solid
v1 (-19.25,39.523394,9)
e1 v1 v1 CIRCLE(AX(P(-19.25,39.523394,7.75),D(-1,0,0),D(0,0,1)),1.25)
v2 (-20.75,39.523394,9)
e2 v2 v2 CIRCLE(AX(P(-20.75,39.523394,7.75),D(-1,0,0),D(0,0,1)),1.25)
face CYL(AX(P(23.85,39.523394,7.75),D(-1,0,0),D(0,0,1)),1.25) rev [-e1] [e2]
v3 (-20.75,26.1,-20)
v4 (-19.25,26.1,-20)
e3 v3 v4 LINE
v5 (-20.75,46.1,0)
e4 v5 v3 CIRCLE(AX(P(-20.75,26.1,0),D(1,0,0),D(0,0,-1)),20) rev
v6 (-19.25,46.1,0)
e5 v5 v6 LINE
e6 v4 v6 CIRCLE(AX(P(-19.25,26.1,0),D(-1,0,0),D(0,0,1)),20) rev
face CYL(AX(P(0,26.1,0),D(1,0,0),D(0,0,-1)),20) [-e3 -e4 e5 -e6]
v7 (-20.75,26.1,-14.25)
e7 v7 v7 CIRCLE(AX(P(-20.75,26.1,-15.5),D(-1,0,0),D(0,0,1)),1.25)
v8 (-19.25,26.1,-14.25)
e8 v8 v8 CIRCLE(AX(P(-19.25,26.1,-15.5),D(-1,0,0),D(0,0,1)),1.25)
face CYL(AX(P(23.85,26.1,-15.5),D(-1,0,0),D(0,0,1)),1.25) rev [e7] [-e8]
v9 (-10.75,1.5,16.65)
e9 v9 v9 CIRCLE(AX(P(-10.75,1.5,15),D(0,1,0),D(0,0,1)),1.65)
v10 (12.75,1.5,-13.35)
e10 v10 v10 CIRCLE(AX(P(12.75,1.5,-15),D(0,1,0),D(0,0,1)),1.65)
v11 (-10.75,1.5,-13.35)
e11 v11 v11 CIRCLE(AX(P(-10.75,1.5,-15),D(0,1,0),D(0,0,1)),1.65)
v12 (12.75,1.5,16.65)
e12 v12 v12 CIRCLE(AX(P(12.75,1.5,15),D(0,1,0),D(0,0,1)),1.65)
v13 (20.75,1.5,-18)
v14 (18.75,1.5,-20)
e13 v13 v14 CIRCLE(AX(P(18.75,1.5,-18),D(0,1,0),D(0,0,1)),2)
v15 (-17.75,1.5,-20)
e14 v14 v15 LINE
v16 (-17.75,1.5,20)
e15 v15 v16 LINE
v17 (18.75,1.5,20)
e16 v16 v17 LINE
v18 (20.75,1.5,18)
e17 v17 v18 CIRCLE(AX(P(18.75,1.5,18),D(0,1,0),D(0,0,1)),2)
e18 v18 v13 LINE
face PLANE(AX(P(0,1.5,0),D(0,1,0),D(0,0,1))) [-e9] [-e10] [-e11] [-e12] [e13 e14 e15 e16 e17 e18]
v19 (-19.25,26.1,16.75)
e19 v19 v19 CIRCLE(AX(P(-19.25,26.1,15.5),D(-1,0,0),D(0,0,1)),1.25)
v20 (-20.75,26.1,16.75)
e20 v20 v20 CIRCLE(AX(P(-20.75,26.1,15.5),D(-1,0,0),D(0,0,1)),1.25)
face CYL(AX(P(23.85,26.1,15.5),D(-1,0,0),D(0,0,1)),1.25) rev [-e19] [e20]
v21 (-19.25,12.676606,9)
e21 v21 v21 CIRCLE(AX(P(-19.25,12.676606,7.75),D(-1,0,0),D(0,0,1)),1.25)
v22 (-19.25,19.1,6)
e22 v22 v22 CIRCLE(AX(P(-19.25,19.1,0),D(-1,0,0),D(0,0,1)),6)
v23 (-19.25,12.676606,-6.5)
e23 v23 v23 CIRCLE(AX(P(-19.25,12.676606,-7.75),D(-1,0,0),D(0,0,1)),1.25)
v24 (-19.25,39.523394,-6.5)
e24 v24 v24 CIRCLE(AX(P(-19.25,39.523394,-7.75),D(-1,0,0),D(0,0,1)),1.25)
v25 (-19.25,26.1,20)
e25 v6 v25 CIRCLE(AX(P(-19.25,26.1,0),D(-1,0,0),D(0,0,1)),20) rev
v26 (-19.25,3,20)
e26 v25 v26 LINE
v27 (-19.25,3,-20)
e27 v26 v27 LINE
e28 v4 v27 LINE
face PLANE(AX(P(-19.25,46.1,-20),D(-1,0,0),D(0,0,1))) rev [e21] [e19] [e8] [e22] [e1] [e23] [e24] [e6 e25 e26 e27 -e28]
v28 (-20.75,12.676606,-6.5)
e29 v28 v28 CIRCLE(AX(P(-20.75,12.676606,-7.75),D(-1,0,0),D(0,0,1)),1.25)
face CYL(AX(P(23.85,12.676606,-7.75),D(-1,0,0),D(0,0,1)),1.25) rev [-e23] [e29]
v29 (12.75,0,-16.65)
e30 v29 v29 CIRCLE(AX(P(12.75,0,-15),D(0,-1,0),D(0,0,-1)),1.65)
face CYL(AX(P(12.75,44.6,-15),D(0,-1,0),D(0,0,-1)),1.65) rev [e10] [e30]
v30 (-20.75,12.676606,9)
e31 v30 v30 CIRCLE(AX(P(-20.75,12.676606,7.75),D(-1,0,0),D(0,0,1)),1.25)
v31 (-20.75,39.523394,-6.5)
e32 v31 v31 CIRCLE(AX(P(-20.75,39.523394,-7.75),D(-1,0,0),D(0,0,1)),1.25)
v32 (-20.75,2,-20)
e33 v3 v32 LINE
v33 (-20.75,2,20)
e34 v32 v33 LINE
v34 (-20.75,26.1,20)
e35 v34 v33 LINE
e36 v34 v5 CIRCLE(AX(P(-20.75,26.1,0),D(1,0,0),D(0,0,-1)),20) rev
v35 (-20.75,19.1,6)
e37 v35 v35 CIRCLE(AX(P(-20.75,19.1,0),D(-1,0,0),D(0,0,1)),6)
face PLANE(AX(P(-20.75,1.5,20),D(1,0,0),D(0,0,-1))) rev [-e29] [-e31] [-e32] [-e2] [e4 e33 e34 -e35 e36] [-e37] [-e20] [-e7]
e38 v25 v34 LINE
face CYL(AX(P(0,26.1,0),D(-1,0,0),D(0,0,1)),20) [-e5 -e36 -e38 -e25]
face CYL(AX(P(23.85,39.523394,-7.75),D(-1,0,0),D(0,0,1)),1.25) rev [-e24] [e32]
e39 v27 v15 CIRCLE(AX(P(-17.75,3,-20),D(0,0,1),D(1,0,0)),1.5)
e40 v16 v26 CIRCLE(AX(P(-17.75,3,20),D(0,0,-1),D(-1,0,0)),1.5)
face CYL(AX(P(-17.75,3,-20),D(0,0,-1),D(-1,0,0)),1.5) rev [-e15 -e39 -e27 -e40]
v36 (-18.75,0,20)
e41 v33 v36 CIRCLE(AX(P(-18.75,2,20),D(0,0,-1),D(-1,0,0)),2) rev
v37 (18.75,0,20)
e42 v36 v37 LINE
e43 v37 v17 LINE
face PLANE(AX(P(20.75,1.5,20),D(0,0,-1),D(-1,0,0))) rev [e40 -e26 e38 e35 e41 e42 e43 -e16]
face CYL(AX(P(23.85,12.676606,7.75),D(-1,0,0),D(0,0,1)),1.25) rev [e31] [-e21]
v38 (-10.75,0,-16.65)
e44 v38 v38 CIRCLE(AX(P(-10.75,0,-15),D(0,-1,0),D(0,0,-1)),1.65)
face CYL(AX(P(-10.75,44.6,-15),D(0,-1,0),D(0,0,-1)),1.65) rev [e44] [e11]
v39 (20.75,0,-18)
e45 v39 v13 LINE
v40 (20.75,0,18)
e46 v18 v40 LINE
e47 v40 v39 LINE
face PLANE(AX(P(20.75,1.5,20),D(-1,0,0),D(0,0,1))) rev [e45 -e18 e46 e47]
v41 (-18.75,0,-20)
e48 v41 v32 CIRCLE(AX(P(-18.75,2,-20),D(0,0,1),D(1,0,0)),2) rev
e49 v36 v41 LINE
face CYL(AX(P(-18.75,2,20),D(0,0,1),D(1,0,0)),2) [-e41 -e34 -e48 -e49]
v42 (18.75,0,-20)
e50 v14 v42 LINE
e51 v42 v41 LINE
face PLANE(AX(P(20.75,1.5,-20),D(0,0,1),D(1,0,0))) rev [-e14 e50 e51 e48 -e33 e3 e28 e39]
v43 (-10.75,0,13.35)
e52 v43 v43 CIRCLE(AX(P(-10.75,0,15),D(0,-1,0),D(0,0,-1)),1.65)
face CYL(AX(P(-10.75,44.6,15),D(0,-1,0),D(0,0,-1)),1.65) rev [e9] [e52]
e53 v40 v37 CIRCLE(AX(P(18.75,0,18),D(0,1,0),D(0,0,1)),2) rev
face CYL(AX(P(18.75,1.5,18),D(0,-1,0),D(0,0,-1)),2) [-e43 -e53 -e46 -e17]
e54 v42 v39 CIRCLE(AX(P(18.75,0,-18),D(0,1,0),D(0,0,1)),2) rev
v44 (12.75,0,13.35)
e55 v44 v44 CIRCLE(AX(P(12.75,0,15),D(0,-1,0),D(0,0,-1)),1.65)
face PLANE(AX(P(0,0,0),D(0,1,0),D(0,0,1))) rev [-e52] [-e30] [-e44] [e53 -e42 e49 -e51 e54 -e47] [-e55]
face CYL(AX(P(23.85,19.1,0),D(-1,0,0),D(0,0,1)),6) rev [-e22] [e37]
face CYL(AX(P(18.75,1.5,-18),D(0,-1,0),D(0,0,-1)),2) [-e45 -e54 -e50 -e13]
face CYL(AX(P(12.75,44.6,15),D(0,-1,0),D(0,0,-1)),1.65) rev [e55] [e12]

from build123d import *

# Parameters (mm, degrees)
SKETCH_1_W          = 41.5
SKETCH_1_H          = 40
EXTRUDE_1_DEPTH     = 1.5
SKETCH_2_W          = 1.5
SKETCH_2_H          = 40
EXTRUDE_2_DEPTH     = 44.6
FILLET_2_R          = 20
FILLET_3_R          = 20
SKETCH_3_R          = 1.25
SKETCH_3_R_2        = 6
CUT_EXTRUDE_1_DEPTH = 44.6
SKETCH_4_R          = 1.65
CUT_EXTRUDE_2_DEPTH = 44.6
FILLET_5_R          = 2
FILLET_6_R          = 2
FILLET_7_R          = 1.5


with BuildPart() as part:
    # Эскиз1 → Бобышка-Вытянуть1 (new body)
    with BuildSketch(Plane(origin=(0, 0, 0), x_dir=(1, 0, 0), z_dir=(0, 1, 0))):
        Rectangle(SKETCH_1_W, SKETCH_1_H)
    extrude(amount=EXTRUDE_1_DEPTH)

    # Эскиз2 → Бобышка-Вытянуть2 (add)
    with BuildSketch(Plane(origin=(0, 1.5, 0), x_dir=(1, 0, 0), z_dir=(0, 1, 0))):
        with Locations((-20, 0)):
            Rectangle(SKETCH_2_W, SKETCH_2_H)
    extrude(amount=EXTRUDE_2_DEPTH)

    # Скругление2
    fillet_2_edges = [part.edges().sort_by_distance(p)[0] for p in [
        (-20, 46.1, 20),
    ]]
    fillet(fillet_2_edges, radius=FILLET_2_R)

    # Скругление3
    fillet_3_edges = [part.edges().sort_by_distance(p)[0] for p in [
        (-20, 46.1, -20),
    ]]
    fillet(fillet_3_edges, radius=FILLET_3_R - 0.0001)  # a hair under: the kernel refuses the full size

    # Эскиз3 → Вырез-Вытянуть1 (cut)
    with BuildSketch(Plane.ZY.offset(20.75)):
        with Locations((-15.5, 26.1)):
            Circle(SKETCH_3_R)
        with Locations((-7.75, 39.523393759)):
            Circle(SKETCH_3_R)
        with Locations((7.75, 39.523393759)):
            Circle(SKETCH_3_R)
        with Locations((15.5, 26.1)):
            Circle(SKETCH_3_R)
        with Locations((7.75, 12.676606241)):
            Circle(SKETCH_3_R)
        with Locations((-7.75, 12.676606241)):
            Circle(SKETCH_3_R)
        with Locations((0, 19.1)):
            Circle(SKETCH_3_R_2)
    extrude(amount=-CUT_EXTRUDE_1_DEPTH, mode=Mode.SUBTRACT)

    # Эскиз4 → Вырез-Вытянуть2 (cut)
    with BuildSketch(Plane.XZ):
        with Locations(Location((12.75, 15, 0), (0, 0, 270))):
            Circle(SKETCH_4_R)
        with Locations(Location((-10.75, 15, 0), (0, 0, 270))):
            Circle(SKETCH_4_R)
        with Locations(Location((-10.75, -15, 0), (0, 0, 270))):
            Circle(SKETCH_4_R)
        with Locations(Location((12.75, -15, 0), (0, 0, 270))):
            Circle(SKETCH_4_R)
    extrude(amount=-CUT_EXTRUDE_2_DEPTH, mode=Mode.SUBTRACT)

    # Скругление5
    fillet_5_edges = [part.edges().sort_by_distance(p)[0] for p in [
        (20.75, 0.75, -20),
        (20.75, 0.75, 20),
    ]]
    fillet(fillet_5_edges, radius=FILLET_5_R)

    # Скругление6
    fillet_6_edges = [part.edges().sort_by_distance(p)[0] for p in [
        (-20.75, 0, 0),
    ]]
    fillet(fillet_6_edges, radius=FILLET_6_R)

    # Скругление7
    fillet_7_edges = [part.edges().sort_by_distance(p)[0] for p in [
        (-19.25, 1.5, 0),
    ]]
    fillet(fillet_7_edges, radius=FILLET_7_R)


solid = part.part
